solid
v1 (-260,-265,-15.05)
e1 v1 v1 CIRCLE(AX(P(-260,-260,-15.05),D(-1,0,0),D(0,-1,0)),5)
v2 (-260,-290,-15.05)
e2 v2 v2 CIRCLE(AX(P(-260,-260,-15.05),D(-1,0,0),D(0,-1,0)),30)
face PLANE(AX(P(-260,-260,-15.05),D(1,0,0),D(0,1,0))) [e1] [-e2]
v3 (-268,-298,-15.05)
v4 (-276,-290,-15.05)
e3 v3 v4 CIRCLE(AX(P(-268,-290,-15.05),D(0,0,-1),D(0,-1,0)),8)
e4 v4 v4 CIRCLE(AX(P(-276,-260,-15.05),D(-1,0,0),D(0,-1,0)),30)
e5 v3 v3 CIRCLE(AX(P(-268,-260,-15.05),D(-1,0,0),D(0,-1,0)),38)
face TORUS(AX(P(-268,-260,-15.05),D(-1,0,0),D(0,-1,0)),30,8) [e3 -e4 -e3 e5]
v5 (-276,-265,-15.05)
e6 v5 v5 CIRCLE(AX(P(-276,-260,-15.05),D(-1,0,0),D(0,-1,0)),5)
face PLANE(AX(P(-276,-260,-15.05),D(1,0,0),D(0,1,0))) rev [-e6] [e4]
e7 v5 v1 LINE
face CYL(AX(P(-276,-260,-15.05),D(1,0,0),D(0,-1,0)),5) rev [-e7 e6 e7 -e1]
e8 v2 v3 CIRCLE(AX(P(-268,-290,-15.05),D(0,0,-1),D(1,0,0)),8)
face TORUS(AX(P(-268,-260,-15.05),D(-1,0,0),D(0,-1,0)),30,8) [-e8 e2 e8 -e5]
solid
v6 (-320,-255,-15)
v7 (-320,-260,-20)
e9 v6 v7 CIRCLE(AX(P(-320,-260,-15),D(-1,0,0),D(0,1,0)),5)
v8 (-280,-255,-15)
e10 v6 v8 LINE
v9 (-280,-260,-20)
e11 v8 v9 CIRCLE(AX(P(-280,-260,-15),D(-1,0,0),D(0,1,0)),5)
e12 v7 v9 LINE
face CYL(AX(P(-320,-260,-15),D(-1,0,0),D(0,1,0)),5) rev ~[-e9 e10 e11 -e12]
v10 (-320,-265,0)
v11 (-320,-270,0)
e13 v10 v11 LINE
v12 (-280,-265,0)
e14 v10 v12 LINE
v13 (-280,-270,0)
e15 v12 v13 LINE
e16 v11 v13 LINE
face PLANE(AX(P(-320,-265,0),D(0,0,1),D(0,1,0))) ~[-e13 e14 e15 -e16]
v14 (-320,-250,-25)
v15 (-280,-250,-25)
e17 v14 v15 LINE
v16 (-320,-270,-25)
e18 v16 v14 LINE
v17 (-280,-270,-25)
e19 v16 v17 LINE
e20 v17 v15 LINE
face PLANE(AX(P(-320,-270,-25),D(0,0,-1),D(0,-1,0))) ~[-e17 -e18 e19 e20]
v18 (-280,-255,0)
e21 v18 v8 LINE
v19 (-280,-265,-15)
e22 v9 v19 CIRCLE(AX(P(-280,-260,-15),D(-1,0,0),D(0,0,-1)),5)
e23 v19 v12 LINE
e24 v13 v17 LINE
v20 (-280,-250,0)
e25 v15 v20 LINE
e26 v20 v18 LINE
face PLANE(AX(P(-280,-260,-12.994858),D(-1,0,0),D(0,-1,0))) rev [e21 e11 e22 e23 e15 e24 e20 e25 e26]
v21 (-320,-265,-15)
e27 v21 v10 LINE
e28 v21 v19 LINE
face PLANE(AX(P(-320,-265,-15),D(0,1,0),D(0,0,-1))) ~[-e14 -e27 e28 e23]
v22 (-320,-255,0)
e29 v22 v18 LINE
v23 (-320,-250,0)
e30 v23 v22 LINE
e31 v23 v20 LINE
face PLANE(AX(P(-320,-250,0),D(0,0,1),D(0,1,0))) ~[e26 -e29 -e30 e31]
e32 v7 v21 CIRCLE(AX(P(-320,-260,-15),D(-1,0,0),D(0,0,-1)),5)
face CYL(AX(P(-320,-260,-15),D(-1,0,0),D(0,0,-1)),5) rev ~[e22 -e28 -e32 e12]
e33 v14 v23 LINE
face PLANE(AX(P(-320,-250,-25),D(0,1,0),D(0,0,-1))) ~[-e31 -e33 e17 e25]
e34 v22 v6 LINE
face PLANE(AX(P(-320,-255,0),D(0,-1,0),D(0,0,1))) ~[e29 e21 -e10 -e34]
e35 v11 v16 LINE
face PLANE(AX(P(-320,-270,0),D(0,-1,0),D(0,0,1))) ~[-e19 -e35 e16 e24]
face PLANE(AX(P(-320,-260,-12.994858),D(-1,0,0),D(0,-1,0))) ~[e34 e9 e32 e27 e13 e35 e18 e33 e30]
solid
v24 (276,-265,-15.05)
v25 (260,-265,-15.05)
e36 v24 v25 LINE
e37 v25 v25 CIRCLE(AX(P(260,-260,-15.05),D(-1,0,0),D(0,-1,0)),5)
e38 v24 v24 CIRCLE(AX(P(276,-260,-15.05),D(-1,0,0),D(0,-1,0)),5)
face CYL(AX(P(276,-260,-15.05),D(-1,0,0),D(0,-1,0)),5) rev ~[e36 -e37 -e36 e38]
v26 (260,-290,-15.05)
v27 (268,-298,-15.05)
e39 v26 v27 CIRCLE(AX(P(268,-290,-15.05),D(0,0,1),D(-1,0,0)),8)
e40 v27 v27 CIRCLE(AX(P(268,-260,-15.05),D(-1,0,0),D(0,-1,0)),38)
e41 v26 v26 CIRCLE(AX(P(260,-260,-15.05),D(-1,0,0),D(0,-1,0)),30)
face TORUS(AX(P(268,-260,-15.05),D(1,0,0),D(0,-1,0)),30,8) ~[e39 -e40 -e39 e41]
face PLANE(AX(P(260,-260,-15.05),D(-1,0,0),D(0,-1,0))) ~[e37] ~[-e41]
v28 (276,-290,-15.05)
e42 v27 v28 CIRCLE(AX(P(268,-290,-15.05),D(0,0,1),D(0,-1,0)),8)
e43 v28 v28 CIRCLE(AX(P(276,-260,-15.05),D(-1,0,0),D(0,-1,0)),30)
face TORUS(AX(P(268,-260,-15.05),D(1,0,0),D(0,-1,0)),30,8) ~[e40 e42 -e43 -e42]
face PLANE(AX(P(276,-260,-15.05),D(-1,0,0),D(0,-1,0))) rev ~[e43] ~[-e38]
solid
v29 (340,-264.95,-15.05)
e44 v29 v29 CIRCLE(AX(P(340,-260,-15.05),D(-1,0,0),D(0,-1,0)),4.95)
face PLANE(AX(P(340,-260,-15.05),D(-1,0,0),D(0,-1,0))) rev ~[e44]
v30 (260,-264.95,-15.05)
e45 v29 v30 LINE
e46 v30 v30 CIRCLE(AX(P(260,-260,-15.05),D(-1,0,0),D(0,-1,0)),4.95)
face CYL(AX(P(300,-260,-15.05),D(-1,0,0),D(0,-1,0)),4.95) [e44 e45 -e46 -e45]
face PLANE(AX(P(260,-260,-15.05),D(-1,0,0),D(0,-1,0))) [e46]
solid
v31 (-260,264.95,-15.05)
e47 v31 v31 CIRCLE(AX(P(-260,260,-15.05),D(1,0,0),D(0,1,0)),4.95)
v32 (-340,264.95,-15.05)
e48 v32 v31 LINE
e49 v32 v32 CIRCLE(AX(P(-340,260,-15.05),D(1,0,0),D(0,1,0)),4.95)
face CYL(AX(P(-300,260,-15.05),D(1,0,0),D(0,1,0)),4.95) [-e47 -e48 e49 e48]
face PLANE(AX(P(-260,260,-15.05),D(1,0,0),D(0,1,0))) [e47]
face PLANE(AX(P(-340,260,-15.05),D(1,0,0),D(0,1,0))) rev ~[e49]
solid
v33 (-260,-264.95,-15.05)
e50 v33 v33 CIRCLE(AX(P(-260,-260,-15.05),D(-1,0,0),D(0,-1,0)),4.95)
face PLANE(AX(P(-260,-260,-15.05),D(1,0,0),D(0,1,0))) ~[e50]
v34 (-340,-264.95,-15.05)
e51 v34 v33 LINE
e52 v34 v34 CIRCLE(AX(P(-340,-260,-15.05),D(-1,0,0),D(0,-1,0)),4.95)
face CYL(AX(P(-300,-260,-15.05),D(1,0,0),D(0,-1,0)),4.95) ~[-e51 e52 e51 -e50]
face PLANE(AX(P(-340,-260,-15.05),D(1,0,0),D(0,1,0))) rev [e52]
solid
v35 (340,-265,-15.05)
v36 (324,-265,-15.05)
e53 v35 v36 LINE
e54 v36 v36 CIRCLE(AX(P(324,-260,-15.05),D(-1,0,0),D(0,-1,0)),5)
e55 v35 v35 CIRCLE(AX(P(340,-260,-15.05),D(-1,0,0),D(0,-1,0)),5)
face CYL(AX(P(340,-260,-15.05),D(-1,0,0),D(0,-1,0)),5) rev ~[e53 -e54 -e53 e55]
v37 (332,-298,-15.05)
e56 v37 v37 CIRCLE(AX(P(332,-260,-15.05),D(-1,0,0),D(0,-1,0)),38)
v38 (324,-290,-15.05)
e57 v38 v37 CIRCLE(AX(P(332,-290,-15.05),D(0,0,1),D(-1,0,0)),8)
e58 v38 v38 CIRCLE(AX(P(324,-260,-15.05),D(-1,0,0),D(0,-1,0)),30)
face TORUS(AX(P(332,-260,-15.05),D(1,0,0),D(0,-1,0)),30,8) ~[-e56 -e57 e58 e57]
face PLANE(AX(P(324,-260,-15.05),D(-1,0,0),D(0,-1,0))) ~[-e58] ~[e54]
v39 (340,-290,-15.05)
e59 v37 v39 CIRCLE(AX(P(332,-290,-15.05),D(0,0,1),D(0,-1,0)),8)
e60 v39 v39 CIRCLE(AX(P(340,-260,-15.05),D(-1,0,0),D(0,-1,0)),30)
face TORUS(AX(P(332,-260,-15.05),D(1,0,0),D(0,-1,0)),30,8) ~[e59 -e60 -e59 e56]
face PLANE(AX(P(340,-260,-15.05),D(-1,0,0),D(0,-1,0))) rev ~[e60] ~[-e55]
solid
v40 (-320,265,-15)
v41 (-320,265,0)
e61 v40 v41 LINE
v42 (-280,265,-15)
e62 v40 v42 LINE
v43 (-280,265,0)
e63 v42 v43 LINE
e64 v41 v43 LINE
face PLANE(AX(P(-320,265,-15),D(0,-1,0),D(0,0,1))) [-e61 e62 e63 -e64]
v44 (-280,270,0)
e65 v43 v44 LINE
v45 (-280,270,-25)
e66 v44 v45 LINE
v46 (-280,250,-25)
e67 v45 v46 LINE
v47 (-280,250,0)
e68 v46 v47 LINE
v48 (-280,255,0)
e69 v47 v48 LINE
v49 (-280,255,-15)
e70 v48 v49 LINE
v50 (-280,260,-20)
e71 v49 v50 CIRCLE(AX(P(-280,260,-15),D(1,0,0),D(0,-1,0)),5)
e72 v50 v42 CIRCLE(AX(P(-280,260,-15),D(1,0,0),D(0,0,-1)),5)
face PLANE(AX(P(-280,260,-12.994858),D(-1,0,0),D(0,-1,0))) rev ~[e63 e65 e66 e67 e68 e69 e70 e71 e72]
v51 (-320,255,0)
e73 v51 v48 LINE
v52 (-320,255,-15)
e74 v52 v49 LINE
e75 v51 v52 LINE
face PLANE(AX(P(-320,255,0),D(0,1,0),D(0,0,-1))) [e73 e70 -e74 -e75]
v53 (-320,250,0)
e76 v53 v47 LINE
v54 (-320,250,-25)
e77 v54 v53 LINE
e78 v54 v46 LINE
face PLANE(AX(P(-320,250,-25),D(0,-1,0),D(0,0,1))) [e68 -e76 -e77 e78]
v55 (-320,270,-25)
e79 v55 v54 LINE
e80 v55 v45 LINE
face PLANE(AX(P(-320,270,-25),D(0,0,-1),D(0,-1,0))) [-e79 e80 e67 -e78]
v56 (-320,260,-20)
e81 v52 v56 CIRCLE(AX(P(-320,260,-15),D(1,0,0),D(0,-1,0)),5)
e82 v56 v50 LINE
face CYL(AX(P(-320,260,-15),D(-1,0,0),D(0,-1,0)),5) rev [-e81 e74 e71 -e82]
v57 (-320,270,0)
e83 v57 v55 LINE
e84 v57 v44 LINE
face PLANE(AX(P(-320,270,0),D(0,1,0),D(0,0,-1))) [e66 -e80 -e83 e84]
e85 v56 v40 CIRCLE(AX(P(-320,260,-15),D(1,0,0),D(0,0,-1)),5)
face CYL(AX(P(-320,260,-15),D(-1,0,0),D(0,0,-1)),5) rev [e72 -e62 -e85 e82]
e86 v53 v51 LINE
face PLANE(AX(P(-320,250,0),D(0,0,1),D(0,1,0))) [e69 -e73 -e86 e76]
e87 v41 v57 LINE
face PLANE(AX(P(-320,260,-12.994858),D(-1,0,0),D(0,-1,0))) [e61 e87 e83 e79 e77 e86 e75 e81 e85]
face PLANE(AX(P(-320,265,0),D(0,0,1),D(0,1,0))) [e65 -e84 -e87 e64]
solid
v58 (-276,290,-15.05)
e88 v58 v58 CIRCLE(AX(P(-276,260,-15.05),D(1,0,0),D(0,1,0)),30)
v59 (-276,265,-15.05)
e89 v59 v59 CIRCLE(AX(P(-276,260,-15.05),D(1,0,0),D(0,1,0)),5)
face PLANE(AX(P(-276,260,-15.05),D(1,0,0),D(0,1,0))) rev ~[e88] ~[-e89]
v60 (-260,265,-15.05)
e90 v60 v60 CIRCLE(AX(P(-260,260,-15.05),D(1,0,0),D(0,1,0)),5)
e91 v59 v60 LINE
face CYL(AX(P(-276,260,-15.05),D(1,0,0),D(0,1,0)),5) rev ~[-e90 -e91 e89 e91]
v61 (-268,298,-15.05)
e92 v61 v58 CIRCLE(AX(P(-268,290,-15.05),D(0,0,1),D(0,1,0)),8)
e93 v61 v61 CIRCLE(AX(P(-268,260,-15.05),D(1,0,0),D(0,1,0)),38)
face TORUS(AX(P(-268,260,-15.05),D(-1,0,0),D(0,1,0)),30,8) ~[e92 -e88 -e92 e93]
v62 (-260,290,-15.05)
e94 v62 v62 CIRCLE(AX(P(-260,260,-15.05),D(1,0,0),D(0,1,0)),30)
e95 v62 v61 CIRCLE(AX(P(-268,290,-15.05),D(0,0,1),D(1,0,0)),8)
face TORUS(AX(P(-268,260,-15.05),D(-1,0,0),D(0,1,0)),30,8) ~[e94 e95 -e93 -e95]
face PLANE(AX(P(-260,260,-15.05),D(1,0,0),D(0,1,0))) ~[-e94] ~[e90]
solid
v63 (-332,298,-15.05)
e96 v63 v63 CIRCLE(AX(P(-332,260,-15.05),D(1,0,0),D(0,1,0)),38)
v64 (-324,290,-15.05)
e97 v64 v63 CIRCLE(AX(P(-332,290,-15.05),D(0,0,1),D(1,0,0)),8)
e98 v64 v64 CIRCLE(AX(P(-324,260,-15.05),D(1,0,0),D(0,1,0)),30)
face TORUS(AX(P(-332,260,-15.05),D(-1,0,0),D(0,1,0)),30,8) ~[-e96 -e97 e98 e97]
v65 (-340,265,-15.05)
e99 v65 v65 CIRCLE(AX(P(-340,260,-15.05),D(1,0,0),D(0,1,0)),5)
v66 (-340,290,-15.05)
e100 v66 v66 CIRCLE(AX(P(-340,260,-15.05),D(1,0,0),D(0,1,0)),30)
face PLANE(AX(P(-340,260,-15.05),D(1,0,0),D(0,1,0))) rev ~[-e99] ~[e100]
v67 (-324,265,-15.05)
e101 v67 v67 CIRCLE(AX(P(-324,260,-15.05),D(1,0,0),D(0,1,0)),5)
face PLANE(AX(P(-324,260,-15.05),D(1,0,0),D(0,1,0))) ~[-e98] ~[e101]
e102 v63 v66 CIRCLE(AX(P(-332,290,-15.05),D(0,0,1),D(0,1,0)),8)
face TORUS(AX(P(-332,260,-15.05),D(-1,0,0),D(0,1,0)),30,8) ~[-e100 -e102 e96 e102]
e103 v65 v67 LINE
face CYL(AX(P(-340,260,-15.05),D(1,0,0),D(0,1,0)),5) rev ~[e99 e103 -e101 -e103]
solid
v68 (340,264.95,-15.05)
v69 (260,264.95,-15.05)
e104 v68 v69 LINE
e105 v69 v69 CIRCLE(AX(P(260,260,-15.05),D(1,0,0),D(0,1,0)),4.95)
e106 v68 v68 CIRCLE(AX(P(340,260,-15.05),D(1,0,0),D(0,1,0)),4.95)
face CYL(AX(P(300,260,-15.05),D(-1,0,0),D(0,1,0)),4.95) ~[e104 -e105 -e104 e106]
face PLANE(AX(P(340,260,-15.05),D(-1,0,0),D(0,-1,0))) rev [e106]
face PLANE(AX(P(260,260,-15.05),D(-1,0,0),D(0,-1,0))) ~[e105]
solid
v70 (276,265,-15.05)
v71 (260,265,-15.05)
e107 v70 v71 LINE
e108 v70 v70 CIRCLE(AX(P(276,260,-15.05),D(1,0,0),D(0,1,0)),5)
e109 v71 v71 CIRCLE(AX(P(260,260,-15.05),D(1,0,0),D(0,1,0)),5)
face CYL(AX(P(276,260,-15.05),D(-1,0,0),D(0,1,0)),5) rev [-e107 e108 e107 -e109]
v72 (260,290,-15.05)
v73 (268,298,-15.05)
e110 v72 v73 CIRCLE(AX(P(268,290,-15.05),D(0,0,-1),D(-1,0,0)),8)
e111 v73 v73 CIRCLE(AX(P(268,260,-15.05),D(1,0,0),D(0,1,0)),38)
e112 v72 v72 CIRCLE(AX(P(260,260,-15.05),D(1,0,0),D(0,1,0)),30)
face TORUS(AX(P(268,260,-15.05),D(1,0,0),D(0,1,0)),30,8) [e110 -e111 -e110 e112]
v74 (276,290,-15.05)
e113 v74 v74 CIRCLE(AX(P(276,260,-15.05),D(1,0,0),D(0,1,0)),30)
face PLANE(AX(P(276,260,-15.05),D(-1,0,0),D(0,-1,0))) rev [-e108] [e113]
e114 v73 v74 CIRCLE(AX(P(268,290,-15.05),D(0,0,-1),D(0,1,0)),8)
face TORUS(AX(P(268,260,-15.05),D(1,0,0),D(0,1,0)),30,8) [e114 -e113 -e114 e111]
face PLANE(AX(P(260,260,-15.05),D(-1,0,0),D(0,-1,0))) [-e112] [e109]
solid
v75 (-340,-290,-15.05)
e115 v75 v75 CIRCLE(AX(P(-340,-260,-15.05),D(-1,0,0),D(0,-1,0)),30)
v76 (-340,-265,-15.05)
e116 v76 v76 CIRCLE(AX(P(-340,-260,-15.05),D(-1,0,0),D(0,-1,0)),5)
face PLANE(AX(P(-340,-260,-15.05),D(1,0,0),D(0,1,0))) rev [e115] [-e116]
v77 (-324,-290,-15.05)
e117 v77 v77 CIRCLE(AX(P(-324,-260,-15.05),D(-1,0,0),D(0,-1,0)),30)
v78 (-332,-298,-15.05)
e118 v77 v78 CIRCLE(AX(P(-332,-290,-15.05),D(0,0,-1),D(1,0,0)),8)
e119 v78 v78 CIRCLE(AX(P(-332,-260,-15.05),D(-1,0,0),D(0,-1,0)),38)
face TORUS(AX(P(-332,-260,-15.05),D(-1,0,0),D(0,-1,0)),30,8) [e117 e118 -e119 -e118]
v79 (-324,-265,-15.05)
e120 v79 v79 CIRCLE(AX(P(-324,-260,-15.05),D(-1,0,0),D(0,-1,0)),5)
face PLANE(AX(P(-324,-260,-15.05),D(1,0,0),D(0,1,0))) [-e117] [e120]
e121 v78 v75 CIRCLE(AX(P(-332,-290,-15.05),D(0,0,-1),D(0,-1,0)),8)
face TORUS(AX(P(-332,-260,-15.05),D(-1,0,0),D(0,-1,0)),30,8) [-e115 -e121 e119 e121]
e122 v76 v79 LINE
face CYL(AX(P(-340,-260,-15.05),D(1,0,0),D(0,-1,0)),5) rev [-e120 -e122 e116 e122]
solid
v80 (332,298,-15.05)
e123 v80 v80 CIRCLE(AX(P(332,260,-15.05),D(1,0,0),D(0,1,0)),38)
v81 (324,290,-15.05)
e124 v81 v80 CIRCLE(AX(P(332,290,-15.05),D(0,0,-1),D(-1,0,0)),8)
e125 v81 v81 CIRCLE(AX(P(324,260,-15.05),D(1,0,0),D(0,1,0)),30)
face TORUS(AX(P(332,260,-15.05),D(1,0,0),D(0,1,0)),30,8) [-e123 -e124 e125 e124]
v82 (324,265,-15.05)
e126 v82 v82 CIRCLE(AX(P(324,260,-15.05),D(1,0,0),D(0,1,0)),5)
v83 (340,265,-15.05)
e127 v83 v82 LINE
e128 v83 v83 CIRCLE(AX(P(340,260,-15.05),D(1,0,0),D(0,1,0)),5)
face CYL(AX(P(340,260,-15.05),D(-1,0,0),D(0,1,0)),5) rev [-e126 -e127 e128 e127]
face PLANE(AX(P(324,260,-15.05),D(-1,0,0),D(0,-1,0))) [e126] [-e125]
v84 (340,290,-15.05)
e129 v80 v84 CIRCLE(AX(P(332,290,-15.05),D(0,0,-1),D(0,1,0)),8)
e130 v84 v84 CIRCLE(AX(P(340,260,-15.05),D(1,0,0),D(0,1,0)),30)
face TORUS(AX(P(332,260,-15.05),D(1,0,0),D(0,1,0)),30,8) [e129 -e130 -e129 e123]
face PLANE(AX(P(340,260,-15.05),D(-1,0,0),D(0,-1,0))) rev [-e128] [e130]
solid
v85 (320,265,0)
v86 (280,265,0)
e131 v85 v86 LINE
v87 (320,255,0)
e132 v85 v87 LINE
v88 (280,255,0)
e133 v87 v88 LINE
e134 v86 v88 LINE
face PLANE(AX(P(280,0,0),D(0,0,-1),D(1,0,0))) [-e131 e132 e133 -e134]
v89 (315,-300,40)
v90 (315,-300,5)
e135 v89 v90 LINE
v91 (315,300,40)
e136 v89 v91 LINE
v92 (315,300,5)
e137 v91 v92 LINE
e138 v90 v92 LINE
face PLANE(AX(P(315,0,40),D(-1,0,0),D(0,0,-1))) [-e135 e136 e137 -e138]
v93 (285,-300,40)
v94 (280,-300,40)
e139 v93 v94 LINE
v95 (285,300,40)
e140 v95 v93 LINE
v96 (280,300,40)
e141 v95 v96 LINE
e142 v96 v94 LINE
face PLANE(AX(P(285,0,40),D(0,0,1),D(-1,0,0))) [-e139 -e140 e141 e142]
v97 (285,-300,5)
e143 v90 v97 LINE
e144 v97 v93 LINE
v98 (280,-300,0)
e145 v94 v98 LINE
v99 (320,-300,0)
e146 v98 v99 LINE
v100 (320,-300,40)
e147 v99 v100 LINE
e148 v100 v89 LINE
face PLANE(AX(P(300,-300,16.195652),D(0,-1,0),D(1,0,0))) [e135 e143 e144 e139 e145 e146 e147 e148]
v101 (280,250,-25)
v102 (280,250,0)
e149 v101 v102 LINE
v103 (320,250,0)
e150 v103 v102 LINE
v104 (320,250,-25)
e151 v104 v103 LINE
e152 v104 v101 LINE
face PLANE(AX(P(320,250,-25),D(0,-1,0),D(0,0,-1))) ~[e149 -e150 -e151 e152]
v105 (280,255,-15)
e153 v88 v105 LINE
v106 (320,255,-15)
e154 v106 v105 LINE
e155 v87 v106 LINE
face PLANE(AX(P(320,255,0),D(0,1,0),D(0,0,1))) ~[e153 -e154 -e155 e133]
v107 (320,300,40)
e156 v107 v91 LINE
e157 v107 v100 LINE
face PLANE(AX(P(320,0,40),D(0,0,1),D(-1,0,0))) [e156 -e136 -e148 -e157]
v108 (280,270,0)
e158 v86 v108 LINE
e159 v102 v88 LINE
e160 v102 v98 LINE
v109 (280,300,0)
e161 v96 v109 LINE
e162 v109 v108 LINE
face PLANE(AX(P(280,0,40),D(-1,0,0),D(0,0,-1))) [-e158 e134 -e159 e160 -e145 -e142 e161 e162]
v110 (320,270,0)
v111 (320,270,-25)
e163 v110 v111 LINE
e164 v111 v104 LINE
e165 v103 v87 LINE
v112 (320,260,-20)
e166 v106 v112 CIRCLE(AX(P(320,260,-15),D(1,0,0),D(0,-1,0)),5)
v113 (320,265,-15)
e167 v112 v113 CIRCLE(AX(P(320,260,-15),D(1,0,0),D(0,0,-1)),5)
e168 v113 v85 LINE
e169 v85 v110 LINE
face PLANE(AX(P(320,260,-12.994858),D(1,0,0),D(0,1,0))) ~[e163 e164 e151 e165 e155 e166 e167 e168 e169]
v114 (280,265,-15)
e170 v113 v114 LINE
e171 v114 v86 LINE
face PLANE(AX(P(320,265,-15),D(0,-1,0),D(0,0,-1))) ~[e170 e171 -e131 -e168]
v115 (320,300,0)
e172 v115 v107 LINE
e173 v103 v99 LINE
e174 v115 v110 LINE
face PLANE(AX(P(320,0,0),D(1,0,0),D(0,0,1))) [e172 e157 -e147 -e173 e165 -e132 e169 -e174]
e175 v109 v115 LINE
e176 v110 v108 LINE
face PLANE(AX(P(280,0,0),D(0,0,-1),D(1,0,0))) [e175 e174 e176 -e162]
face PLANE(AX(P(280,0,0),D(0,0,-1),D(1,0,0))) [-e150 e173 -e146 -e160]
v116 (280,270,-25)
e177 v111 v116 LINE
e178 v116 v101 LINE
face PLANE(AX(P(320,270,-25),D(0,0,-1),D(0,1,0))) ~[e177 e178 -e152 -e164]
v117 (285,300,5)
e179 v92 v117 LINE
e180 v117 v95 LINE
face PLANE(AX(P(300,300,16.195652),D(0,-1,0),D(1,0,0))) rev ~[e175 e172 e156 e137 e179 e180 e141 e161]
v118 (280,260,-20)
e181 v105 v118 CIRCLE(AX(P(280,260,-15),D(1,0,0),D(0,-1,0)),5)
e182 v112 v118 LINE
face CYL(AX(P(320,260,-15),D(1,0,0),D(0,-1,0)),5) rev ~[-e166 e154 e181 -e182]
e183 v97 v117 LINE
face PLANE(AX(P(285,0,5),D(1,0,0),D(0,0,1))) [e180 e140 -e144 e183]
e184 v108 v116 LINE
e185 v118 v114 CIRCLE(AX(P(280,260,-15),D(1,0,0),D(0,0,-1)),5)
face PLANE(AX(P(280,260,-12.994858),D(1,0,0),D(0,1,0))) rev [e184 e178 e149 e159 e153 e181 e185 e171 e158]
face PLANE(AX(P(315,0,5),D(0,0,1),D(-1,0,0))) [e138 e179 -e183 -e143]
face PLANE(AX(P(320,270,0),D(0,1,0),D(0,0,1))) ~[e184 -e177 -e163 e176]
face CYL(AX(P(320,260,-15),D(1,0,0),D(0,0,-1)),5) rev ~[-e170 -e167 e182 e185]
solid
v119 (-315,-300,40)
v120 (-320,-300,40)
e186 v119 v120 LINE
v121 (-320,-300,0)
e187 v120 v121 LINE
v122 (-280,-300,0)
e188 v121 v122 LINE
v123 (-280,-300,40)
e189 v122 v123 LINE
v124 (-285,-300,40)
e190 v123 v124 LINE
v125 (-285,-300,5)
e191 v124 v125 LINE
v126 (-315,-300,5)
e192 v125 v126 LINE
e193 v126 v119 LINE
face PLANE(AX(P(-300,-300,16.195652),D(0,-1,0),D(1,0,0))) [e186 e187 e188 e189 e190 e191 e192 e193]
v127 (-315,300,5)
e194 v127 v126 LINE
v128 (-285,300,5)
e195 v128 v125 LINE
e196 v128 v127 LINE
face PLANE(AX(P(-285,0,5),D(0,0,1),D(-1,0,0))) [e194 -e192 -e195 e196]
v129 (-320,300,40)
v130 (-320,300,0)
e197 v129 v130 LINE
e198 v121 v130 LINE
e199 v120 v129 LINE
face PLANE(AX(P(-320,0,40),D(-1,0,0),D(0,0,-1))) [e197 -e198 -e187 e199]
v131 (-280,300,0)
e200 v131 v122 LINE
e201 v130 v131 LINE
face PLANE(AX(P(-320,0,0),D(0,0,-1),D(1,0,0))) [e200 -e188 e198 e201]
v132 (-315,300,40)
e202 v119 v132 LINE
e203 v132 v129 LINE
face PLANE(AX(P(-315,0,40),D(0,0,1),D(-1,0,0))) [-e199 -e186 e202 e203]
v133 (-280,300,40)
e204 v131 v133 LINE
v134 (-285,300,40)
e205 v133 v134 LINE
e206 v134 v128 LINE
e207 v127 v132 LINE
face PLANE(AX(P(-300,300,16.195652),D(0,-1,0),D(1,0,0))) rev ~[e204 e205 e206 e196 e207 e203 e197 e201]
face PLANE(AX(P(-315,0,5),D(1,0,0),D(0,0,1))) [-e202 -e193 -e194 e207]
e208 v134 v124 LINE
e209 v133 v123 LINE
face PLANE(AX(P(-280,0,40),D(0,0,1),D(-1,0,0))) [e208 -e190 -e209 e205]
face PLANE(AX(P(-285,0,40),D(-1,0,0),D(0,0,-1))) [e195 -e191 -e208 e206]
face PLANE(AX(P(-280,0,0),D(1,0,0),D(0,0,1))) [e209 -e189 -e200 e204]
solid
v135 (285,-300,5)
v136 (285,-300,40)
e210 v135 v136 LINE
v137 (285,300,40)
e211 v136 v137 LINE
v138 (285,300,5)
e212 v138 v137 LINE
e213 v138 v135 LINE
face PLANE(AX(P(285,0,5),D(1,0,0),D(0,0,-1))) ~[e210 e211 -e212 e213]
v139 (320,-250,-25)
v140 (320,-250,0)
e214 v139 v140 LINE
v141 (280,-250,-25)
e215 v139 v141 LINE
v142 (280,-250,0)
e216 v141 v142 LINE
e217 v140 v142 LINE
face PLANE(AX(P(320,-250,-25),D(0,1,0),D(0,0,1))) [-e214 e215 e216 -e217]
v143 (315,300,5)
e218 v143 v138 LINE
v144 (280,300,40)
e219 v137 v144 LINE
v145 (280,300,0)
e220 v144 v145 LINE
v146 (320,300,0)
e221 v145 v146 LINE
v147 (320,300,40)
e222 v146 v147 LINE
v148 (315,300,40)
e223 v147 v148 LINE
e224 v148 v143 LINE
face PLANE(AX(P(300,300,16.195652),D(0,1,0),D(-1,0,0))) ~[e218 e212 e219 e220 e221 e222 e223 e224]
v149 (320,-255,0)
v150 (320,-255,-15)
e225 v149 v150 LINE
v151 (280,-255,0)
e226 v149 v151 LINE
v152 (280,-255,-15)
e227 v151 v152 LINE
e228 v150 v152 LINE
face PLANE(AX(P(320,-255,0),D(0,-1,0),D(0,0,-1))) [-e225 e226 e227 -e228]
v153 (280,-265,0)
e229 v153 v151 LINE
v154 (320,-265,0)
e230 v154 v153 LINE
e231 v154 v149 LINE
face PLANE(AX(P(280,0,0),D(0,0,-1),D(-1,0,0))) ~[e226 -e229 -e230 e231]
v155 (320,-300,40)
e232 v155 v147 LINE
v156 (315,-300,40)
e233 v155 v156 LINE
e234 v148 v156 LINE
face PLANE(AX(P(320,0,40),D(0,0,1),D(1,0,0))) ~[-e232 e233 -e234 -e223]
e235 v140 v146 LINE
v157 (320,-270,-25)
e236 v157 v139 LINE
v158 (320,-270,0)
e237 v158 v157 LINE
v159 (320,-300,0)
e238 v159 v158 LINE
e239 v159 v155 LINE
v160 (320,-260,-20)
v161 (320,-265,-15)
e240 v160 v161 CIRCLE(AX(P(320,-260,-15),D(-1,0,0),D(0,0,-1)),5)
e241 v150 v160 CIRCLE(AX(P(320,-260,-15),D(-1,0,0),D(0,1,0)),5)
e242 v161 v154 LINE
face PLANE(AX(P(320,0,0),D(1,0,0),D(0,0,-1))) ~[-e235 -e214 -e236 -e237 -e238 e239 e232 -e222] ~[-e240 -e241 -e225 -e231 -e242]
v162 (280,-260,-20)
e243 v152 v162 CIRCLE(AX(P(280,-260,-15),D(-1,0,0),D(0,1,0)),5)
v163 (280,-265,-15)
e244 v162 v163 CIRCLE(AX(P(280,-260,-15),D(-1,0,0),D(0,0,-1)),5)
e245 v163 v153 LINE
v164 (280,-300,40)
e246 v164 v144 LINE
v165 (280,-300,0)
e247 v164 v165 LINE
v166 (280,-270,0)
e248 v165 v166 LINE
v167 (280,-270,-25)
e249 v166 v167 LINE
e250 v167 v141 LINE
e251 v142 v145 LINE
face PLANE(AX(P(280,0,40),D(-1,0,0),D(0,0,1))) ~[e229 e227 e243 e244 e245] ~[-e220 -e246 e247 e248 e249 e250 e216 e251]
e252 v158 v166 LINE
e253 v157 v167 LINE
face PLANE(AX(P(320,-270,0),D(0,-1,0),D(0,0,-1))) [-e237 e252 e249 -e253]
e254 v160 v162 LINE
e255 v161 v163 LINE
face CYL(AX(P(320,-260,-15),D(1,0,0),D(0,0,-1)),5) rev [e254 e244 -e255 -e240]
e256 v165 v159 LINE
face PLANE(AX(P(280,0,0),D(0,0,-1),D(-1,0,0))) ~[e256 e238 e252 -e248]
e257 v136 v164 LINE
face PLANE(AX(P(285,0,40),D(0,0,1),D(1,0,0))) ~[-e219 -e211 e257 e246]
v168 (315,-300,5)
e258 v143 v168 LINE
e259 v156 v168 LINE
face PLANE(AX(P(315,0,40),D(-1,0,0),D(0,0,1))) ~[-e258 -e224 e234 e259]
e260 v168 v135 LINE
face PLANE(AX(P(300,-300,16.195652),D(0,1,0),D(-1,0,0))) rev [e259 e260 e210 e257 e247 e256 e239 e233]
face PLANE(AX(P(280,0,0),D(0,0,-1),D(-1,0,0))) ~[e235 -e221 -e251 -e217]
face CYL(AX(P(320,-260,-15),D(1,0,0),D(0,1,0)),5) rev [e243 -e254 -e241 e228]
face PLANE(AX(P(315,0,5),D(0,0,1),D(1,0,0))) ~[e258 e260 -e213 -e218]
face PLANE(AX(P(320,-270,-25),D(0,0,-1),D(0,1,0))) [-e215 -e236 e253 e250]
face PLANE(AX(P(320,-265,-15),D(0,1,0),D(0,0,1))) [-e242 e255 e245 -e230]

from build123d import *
from build123d import SkipClean  # not in build123d's __all__

# Parameters (mm, degrees)
F1_DEPTH      = 300
F1_DEPTH_BACK = 300
F5_DEPTH      = 40
F6_R          = 4.95
F7_DEPTH      = 40
F7_DEPTH_BACK = 40


with BuildPart() as f1:
    # F0 (on Front) → F1 (new body, two sides)
    with BuildSketch(Plane.XZ) as f1_sk:
        Polygon((-320, 0), (-280, 0), (-280, 40), (-285, 40), (-285, 5), (-315, 5), (-315, 40), (-320, 40), align=None)
    extrude(amount=F1_DEPTH)
    extrude(f1_sk.sketch, amount=-F1_DEPTH_BACK)


with BuildPart() as f1b:
    # F0 (on Front) → F1, piece 2 (new body, two sides)
    with BuildSketch(Plane.XZ) as f1_2_sk:
        Polygon((285, 5), (285, 40), (280, 40), (280, 0), (320, 0), (320, 40), (315, 40), (315, 5), align=None)
    extrude(amount=F1_DEPTH)
    extrude(f1_2_sk.sketch, amount=-F1_DEPTH_BACK)

    # F11: F5, F10, F7, F10b across plane


with BuildPart() as f5:
    # F4 (on face) → F5 (new body, through all)
    with BuildSketch(Plane(origin=(-320, 0, 0), x_dir=(0, -1, 0), z_dir=(-1, 0, 0))):
        with BuildLine():
            Line((-265, -15), (-265, 0))
            Line((-265, 0), (-270, 0))
            Line((-270, 0), (-270, -25))
            Line((-270, -25), (-250, -25))
            Line((-250, -25), (-250, 0))
            Line((-250, 0), (-255, 0))
            Line((-255, 0), (-255, -15))
            ThreePointArc((-255, -15), (-256.4644660941, -18.5355339059), (-260, -20))
            ThreePointArc((-260, -20), (-263.5355339059, -18.5355339059), (-265, -15))
        make_face()
    extrude(amount=-F5_DEPTH)


with BuildPart() as f7:
    # F6 (on plane+point) → F7 (new body, two sides)
    with BuildSketch(Plane.YZ.offset(-300)) as f7_sk:
        with Locations((260, -15.05)):
            Circle(F6_R)
    extrude(amount=F7_DEPTH)
    extrude(f7_sk.sketch, amount=-F7_DEPTH_BACK)


with BuildPart() as f10:
    # F9 (on plane+point) → F10 (revolve)
    with BuildSketch(Plane.XY.offset(-15.05)):
        with BuildLine():
            Line((-340, 265), (-332, 265))
            Line((-332, 265), (-324, 265))
            Line((-324, 265), (-324, 290))
            ThreePointArc((-324, 290), (-326.3431457505, 295.6568542495), (-332, 298))
            ThreePointArc((-332, 298), (-337.6568542495, 295.6568542495), (-340, 290))
            Line((-340, 290), (-340, 265))
        make_face()
    revolve(axis=Axis((-316, 260, -15.05), (1, 0, 0)))


with BuildPart() as f10b:
    # F9 (on plane+point) → F10, piece 2 (revolve)
    with BuildSketch(Plane.XY.offset(-15.05)):
        with BuildLine():
            Line((-268, 265), (-260, 265))
            Line((-260, 265), (-260, 290))
            ThreePointArc((-260, 290), (-262.3431457505, 295.6568542495), (-268, 298))
            ThreePointArc((-268, 298), (-273.6568542495, 295.6568542495), (-276, 290))
            Line((-276, 290), (-276, 265))
            Line((-276, 265), (-268, 265))
        make_face()
    revolve(axis=Axis((-316, 260, -15.05), (1, 0, 0)))


with BuildPart() as f1b_1:
    add(f1b.part, clean=False)
    with SkipClean():  # cleaning this boolean's faces spoils the solid; the shape is the same uncleaned
        add(f5.part.mirror(Plane.YZ), clean=False)
        add(f10.part.mirror(Plane.YZ), clean=False)
        add(f7.part.mirror(Plane.YZ), clean=False)
        add(f10b.part.mirror(Plane.YZ), clean=False)


with BuildPart() as f12_1:
    # F12: instance of F5
    add(f5.part.mirror(Plane.XZ), clean=False)


with BuildPart() as f12_2:
    # F12: instance of F1b
    add(f1b_1.part.mirror(Plane.XZ), clean=False)


with BuildPart() as f12_3:
    # F12: instance of F10b
    add(f10b.part.mirror(Plane.XZ), clean=False)


with BuildPart() as f12_4:
    # F12: instance of F7
    add(f7.part.mirror(Plane.XZ), clean=False)


with BuildPart() as f12_5:
    # F12: instance of F10
    add(f10.part.mirror(Plane.XZ), clean=False)


solid = Compound([f1.part, f5.part, f7.part, f10.part, f10b.part, f1b_1.part, f12_1.part, f12_2.part, f12_3.part, f12_4.part, f12_5.part])
